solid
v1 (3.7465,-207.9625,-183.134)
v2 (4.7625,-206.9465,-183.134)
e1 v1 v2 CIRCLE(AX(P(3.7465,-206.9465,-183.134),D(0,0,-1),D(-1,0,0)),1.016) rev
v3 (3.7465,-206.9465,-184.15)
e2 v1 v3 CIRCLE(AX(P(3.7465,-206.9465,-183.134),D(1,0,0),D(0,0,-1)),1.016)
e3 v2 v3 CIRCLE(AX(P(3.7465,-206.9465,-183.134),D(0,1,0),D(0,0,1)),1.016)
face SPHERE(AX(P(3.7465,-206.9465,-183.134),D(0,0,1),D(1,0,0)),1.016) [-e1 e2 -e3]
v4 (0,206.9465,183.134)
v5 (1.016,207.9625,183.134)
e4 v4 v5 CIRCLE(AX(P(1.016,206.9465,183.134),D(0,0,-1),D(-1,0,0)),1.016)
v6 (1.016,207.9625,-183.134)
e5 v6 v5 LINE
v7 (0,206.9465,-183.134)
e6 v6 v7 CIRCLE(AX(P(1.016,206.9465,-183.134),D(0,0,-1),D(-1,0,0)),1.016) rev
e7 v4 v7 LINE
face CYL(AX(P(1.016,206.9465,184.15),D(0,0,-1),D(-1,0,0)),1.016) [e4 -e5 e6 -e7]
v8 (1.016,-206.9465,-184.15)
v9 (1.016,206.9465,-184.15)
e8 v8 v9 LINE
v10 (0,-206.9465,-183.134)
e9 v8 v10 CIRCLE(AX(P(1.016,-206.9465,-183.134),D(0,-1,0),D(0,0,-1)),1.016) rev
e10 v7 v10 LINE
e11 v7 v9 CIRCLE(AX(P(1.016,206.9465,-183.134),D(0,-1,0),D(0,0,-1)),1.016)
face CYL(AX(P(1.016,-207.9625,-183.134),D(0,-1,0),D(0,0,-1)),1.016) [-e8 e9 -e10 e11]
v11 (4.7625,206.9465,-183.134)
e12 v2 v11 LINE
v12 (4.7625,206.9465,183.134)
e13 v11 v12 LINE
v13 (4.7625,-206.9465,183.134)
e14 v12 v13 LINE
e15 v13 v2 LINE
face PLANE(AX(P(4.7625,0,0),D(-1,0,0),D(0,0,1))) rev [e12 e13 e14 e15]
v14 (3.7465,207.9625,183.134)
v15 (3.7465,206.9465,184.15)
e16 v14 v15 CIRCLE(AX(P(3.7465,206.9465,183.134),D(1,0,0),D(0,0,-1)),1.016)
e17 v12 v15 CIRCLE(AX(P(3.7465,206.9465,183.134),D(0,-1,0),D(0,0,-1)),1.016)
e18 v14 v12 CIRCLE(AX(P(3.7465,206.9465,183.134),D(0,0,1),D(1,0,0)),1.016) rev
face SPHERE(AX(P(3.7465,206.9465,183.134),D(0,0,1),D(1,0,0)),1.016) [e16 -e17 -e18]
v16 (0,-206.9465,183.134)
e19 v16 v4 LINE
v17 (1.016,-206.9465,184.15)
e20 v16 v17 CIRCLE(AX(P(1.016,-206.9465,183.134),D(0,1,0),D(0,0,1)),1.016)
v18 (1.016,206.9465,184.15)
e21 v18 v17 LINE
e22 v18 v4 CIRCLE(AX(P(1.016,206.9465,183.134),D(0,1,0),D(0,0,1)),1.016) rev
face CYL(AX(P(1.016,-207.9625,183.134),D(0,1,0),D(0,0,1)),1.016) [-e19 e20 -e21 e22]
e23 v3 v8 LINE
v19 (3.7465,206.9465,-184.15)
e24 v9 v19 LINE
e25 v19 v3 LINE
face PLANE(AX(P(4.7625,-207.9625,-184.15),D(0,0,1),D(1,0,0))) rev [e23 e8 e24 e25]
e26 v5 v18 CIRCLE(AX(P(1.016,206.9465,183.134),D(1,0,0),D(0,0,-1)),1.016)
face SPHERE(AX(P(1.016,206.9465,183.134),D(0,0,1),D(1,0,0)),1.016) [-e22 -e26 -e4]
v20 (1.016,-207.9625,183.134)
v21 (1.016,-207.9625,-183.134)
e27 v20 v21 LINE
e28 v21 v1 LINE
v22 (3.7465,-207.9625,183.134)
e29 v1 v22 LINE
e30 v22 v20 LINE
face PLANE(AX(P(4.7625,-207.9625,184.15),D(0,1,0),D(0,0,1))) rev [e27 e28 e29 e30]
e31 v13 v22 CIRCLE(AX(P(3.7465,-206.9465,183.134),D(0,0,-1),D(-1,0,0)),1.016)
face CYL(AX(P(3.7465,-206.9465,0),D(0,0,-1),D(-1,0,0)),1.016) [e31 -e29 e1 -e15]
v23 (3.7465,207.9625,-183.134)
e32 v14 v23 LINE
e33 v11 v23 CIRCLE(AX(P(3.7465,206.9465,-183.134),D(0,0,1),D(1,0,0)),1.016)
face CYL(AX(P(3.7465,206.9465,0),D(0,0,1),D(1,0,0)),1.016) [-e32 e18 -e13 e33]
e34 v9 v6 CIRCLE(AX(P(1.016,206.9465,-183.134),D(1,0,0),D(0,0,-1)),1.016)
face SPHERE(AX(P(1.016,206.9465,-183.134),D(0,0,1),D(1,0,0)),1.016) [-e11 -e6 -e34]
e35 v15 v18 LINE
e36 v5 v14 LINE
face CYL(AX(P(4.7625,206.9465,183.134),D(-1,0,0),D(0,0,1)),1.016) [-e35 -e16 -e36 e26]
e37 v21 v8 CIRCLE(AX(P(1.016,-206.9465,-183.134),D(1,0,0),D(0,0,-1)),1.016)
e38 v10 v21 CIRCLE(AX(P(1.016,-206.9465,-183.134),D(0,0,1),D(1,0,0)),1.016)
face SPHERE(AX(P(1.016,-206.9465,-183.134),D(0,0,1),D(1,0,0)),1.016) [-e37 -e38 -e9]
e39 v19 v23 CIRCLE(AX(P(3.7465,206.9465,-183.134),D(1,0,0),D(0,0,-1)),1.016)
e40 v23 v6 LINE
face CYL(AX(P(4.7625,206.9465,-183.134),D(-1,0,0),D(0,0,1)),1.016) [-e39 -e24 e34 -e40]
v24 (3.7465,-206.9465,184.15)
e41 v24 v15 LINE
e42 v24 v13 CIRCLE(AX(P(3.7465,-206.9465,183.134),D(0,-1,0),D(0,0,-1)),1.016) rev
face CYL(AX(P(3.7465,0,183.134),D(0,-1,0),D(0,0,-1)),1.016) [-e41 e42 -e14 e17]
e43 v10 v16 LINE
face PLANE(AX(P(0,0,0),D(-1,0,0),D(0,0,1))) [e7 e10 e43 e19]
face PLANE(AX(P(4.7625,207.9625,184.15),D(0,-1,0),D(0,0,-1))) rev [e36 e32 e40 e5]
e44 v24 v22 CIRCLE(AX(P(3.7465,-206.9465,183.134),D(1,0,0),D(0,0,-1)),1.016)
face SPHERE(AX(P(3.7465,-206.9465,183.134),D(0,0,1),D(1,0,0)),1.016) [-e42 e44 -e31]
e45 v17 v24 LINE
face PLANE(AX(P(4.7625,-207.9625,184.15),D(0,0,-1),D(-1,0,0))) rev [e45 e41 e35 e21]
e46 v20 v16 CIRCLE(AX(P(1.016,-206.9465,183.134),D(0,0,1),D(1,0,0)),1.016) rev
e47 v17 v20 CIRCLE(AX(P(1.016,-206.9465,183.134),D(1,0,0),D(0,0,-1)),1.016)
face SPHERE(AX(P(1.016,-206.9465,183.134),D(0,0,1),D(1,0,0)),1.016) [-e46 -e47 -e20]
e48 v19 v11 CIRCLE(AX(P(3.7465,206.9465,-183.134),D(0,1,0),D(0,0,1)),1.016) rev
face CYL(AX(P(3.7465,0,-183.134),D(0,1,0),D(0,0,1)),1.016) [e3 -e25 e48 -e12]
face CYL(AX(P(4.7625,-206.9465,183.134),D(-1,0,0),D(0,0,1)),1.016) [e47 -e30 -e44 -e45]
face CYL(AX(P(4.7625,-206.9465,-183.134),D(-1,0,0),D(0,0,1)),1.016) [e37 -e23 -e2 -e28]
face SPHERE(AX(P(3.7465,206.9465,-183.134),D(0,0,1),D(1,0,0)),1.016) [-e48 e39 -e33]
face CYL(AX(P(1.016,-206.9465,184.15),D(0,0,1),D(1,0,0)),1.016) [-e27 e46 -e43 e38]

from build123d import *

# Parameters (mm, degrees)
SKETCH1_W           = 368.3
SKETCH1_H           = 415.925
BOSS_EXTRUDE1_DEPTH = 4.7625
FILLET1_R           = 1.016
FILLET2_R           = 1.016


with BuildPart() as part:
    # Sketch1 → Boss-Extrude1 (new body)
    with BuildSketch(Plane(origin=(0, 0, 0), x_dir=(0, 0, -1), z_dir=(1, 0, 0))):
        Rectangle(SKETCH1_W, SKETCH1_H)
    extrude(amount=BOSS_EXTRUDE1_DEPTH)

    # Fillet1
    fillet1_edges = [part.edges().sort_by_distance(p)[0] for p in [
        (4.7625, 0, 184.15),
        (4.7625, -207.9625, 0),
        (4.7625, 0, -184.15),
        (0, -207.9625, 0),
        (0, 0, 184.15),
        (0, 207.9625, 0),
        (0, 0, -184.15),
        (4.7625, 207.9625, 0),
    ]]
    fillet(fillet1_edges, radius=FILLET1_R)

    # Fillet2
    # the kernel refuses this fillet: 1.016 mm, written as the material it takes off along each edge
    with BuildSketch(Plane(origin=(1.016, -206.9465, -183.134), x_dir=(0, 0, -1), z_dir=(0, -1, 0))) as fillet2_piece_1_section:
        Polygon((0, 0), (FILLET2_R, 0), (FILLET2_R, -FILLET2_R), (0, -FILLET2_R), align=None)
    fillet2_piece_1 = extrude(amount=FILLET2_R, mode=Mode.PRIVATE)
    fillet2_piece_1 = fillet2_piece_1 - Plane(origin=(1.016, -206.9465, -183.134), x_dir=(0.7071067811865475, 0, 0.7071067811865475), z_dir=(0, -1, 0)) * Sphere(FILLET2_R, mode=Mode.PRIVATE)
    add(fillet2_piece_1, mode=Mode.SUBTRACT)
    with BuildSketch(Plane(origin=(1.016, -206.9465, 183.134), x_dir=(0, 0, 1), z_dir=(0, -1, 0))) as fillet2_piece_2_section:
        Polygon((0, 0), (FILLET2_R, 0), (FILLET2_R, FILLET2_R), (0, FILLET2_R), align=None)
    fillet2_piece_2 = extrude(amount=FILLET2_R, mode=Mode.PRIVATE)
    fillet2_piece_2 = fillet2_piece_2 - Plane(origin=(1.016, -206.9465, 183.134), x_dir=(0.7071067811865475, 0, -0.7071067811865475), z_dir=(0, -1, 0)) * Sphere(FILLET2_R, mode=Mode.PRIVATE)
    add(fillet2_piece_2, mode=Mode.SUBTRACT)
    with BuildSketch(Plane(origin=(1.016, 206.9465, -183.134), x_dir=(0, 1, 0), z_dir=(0, 0, -1))) as fillet2_piece_3_section:
        Polygon((0, 0), (FILLET2_R, 0), (FILLET2_R, -FILLET2_R), (0, -FILLET2_R), align=None)
    fillet2_piece_3 = extrude(amount=FILLET2_R, mode=Mode.PRIVATE)
    fillet2_piece_3 = fillet2_piece_3 - Plane(origin=(1.016, 206.9465, -183.134), x_dir=(0.7071067811865475, -0.7071067811865475, 0), z_dir=(0, 0, -1)) * Sphere(FILLET2_R, mode=Mode.PRIVATE)
    add(fillet2_piece_3, mode=Mode.SUBTRACT)
    with BuildSketch(Plane(origin=(1.016, 206.9465, 183.134), x_dir=(0, 1, 0), z_dir=(0, 0, 1))) as fillet2_piece_4_section:
        Polygon((0, 0), (FILLET2_R, 0), (FILLET2_R, FILLET2_R), (0, FILLET2_R), align=None)
    fillet2_piece_4 = extrude(amount=FILLET2_R, mode=Mode.PRIVATE)
    fillet2_piece_4 = fillet2_piece_4 - Plane(origin=(1.016, 206.9465, 183.134), x_dir=(0.7071067811865475, -0.7071067811865475, 0), z_dir=(0, 0, 1)) * Sphere(FILLET2_R, mode=Mode.PRIVATE)
    add(fillet2_piece_4, mode=Mode.SUBTRACT)
    with BuildSketch(Plane(origin=(3.7465, 206.9465, 183.134), x_dir=(0, 1, 0), z_dir=(0, 0, 1))) as fillet2_piece_5_section:
        Polygon((0, 0), (FILLET2_R, 0), (FILLET2_R, -FILLET2_R), (0, -FILLET2_R), align=None)
    fillet2_piece_5 = extrude(amount=FILLET2_R, mode=Mode.PRIVATE)
    fillet2_piece_5 = fillet2_piece_5 - Plane(origin=(3.7465, 206.9465, 183.134), x_dir=(-0.7071067811865475, -0.7071067811865475, 0), z_dir=(0, 0, 1)) * Sphere(FILLET2_R, mode=Mode.PRIVATE)
    add(fillet2_piece_5, mode=Mode.SUBTRACT)
    with BuildSketch(Plane(origin=(3.7465, 206.9465, -183.134), x_dir=(0, 1, 0), z_dir=(0, 0, -1))) as fillet2_piece_6_section:
        Polygon((0, 0), (FILLET2_R, 0), (FILLET2_R, FILLET2_R), (0, FILLET2_R), align=None)
    fillet2_piece_6 = extrude(amount=FILLET2_R, mode=Mode.PRIVATE)
    fillet2_piece_6 = fillet2_piece_6 - Plane(origin=(3.7465, 206.9465, -183.134), x_dir=(-0.7071067811865475, -0.7071067811865475, 0), z_dir=(0, 0, -1)) * Sphere(FILLET2_R, mode=Mode.PRIVATE)
    add(fillet2_piece_6, mode=Mode.SUBTRACT)
    with BuildSketch(Plane(origin=(3.7465, -206.9465, 183.134), x_dir=(0, 0, 1), z_dir=(0, -1, 0))) as fillet2_piece_7_section:
        Polygon((0, 0), (FILLET2_R, 0), (FILLET2_R, -FILLET2_R), (0, -FILLET2_R), align=None)
    fillet2_piece_7 = extrude(amount=FILLET2_R, mode=Mode.PRIVATE)
    fillet2_piece_7 = fillet2_piece_7 - Plane(origin=(3.7465, -206.9465, 183.134), x_dir=(-0.7071067811865475, 0, -0.7071067811865475), z_dir=(0, -1, 0)) * Sphere(FILLET2_R, mode=Mode.PRIVATE)
    add(fillet2_piece_7, mode=Mode.SUBTRACT)
    with BuildSketch(Plane(origin=(3.7465, -206.9465, -183.134), x_dir=(0, 0, -1), z_dir=(0, -1, 0))) as fillet2_piece_8_section:
        Polygon((0, 0), (FILLET2_R, 0), (FILLET2_R, FILLET2_R), (0, FILLET2_R), align=None)
    fillet2_piece_8 = extrude(amount=FILLET2_R, mode=Mode.PRIVATE)
    fillet2_piece_8 = fillet2_piece_8 - Plane(origin=(3.7465, -206.9465, -183.134), x_dir=(-0.7071067811865475, 0, 0.7071067811865475), z_dir=(0, -1, 0)) * Sphere(FILLET2_R, mode=Mode.PRIVATE)
    add(fillet2_piece_8, mode=Mode.SUBTRACT)
    with BuildSketch(Plane(origin=(1.016, 207.9625, 184.15), x_dir=(0, -1, 0), z_dir=(1, 0, 0)), Plane(origin=(1.016, -207.9625, 184.15), x_dir=(0, 0, -1), z_dir=(1, 0, 0))) as fillet2_piece_9:
        with BuildLine():
            CenterArc((FILLET2_R, FILLET2_R), FILLET2_R, 180, 90)
            Line((0, FILLET2_R), (0, 0))
            Line((0, 0), (FILLET2_R, 0))
        make_face()
    extrude(amount=2.7305, mode=Mode.SUBTRACT)
    with BuildSketch(Plane(origin=(1.016, 207.9625, -184.15), x_dir=(0, -1, 0), z_dir=(1, 0, 0)), Plane(origin=(1.016, -207.9625, -184.15), x_dir=(0, 0, 1), z_dir=(1, 0, 0))) as fillet2_piece_10:
        with BuildLine():
            CenterArc((FILLET2_R, -FILLET2_R), FILLET2_R, 90, 90)
            Line((0, -FILLET2_R), (0, 0))
            Line((0, 0), (FILLET2_R, 0))
        make_face()
    extrude(amount=2.7305, mode=Mode.SUBTRACT)


solid = part.part
